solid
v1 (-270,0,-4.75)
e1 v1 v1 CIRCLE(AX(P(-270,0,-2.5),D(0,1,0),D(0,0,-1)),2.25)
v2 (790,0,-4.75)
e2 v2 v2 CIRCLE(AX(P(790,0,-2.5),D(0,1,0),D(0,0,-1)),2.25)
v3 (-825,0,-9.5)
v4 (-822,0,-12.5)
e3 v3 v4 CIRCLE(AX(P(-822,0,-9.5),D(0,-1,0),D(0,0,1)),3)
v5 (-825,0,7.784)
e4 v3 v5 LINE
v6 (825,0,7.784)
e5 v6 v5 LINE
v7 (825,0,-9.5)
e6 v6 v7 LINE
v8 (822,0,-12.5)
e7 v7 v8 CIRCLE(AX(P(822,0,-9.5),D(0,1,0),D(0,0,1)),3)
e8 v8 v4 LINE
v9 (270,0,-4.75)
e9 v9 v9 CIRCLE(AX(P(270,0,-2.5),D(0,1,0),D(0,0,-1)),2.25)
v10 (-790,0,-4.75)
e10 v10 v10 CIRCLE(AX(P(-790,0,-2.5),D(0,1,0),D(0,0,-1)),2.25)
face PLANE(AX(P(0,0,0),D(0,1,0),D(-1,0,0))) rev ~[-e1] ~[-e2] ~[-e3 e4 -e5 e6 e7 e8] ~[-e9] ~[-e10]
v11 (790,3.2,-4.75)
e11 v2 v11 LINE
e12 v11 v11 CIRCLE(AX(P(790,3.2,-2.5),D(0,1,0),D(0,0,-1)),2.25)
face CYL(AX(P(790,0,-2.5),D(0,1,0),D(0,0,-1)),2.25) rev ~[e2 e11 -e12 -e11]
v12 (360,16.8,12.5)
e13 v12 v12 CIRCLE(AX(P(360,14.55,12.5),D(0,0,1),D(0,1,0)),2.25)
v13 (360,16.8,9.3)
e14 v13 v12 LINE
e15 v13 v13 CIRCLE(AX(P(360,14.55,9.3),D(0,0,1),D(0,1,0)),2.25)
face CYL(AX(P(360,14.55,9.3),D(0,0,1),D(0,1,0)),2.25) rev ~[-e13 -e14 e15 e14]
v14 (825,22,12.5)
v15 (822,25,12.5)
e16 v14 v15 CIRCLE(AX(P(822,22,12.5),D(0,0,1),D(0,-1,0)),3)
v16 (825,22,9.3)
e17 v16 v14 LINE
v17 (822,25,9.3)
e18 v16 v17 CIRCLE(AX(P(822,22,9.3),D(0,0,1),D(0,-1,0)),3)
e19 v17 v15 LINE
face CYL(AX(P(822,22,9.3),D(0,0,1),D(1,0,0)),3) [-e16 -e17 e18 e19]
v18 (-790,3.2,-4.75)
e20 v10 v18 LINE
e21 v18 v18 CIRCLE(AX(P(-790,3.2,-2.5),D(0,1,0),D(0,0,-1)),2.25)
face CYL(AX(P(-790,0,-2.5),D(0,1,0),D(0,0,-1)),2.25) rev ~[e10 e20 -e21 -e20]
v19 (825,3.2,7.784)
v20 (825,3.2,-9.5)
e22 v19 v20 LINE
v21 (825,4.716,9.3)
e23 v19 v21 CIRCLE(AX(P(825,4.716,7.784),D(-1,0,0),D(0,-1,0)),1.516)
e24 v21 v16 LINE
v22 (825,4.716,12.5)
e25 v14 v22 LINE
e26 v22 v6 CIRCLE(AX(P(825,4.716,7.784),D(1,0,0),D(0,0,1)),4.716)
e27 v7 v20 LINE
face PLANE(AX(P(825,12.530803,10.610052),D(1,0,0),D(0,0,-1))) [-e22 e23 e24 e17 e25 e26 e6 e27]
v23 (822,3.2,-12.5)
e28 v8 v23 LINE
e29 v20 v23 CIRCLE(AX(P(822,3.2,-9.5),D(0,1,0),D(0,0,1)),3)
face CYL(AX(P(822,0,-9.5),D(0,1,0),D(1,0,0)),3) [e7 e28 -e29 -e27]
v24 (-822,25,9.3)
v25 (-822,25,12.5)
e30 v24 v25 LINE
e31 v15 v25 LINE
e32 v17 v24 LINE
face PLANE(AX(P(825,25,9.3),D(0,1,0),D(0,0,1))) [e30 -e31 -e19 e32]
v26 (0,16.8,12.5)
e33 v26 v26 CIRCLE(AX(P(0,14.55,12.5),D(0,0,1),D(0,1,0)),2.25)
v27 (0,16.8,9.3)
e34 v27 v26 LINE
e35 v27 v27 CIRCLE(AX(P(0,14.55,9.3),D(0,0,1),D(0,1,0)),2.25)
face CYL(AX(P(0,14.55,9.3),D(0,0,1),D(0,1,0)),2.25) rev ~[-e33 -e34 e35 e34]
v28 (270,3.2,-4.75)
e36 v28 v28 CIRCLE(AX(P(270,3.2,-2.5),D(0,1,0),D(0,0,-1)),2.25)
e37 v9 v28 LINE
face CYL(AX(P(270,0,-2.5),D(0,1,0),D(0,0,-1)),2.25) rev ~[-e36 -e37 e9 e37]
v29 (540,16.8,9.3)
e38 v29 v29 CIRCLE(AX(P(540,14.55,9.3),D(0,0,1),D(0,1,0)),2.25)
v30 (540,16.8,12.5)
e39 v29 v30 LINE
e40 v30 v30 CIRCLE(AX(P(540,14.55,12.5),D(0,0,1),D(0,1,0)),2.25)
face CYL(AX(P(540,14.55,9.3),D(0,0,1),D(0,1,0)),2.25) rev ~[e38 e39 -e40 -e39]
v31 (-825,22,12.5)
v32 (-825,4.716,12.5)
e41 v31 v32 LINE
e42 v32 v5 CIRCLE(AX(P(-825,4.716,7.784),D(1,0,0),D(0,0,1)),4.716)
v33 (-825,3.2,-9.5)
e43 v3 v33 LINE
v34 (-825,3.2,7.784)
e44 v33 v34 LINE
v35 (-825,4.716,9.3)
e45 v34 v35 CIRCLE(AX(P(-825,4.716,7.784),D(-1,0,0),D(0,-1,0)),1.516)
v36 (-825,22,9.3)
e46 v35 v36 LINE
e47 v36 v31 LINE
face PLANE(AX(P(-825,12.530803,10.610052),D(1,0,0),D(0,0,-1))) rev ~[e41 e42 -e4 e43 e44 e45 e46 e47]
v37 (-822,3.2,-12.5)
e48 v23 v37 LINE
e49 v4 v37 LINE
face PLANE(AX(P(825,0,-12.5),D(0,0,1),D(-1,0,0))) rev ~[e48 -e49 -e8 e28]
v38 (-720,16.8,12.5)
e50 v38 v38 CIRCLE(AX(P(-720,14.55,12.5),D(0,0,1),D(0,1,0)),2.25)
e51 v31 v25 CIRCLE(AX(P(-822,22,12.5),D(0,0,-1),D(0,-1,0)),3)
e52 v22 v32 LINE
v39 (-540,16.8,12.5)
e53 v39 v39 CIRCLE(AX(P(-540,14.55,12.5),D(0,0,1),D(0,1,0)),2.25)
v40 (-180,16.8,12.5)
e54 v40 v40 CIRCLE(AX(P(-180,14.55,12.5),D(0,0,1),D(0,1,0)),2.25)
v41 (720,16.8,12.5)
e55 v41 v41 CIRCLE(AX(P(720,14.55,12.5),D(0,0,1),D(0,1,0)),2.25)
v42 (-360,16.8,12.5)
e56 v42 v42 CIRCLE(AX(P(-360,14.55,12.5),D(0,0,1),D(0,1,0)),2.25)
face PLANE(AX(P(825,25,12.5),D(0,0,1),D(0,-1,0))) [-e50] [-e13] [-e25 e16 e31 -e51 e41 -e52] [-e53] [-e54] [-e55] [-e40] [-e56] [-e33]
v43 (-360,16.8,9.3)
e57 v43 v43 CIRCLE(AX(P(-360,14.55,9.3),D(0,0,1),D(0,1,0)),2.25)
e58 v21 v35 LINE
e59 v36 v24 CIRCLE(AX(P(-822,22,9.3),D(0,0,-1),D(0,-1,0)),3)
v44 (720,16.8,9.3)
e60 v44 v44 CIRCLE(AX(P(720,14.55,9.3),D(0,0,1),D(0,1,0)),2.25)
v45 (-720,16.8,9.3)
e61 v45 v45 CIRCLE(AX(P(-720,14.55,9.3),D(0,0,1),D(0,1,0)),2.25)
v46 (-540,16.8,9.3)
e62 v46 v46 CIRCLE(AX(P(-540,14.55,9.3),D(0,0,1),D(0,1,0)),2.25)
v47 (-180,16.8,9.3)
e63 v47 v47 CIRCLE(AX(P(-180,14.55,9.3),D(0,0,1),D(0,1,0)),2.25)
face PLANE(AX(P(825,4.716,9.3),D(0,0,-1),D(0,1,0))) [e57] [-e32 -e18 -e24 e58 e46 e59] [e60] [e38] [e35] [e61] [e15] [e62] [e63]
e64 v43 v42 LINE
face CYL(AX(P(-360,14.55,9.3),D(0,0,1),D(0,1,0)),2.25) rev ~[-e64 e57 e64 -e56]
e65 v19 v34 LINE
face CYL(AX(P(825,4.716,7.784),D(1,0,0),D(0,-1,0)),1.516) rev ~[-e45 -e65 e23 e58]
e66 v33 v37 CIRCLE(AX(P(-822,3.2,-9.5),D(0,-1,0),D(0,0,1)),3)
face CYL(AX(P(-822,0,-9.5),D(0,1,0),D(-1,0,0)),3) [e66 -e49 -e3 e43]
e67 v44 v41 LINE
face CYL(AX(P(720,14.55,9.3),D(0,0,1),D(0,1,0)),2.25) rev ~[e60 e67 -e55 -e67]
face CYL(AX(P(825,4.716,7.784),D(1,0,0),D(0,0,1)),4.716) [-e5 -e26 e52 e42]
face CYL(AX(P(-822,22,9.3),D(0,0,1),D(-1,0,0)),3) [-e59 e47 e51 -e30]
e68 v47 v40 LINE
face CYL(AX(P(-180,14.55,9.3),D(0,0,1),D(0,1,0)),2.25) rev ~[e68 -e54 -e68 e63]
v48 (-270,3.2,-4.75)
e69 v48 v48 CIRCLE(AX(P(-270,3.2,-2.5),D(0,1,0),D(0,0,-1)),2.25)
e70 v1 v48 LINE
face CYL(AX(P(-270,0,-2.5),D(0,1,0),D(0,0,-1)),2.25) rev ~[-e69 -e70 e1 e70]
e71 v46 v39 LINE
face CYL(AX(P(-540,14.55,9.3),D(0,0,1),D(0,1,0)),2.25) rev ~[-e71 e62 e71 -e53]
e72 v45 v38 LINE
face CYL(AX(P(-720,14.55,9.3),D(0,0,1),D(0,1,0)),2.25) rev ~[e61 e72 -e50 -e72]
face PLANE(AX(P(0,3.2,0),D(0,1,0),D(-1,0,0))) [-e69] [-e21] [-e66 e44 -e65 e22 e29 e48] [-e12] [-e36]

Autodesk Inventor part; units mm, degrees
ref_plane "YZ Plane" through (0, 0, 0) normal (1, 0, 0) x (0, 1, 0)
ref_plane "XZ Plane" through (0, 0, 0) normal (0, 1, 0) x (-1, 0, 0)
ref_plane "XY Plane" through (0, 0, 0) normal (0, 0, 1) x (1, 0, 0)
sketch "Sketch1" plane through (0, 0, 0) normal (0, 1, 0) x (-1, 0, 0)
  line L0 (825, 12.5) -> (-825, 12.5)
  line L1 (-825, 12.5) -> (-825, -12.5)
  line L2 (-825, -12.5) -> (825, -12.5)
  line L3 (825, -12.5) -> (825, 12.5)
  line L4 (825, 12.5) -> (-825, -12.5) construction
  line L5 (-825, 12.5) -> (825, -12.5) construction
  point P0 (0, 0)
  dimension "d0" = 1650
  dimension "d1" = 25
extrude "Plate1" add sketch "Sketch1" along normal blind 3.2
sketch "Sketch2" plane through (825, 0, 9.3) normal (0, 0, 1) x (1, 0, 0)
  line L0 (-1650, 0) -> (0, 0)
  line L1 (0, 0) -> (0, 25)
  line L2 (0, 25) -> (-1650, 25)
  line L3 (-1650, 25) -> (-1650, 0)
edge flange "Flange1" height 25 angle 90 thickness 3.2 bend radius 1.516 thickness toward (0, 0, 1) relief tear relief width 3.2 relief depth 1.6 edges at (0, 3.2, 12.5) wall of the first edge with corners at (-825, 0, 9.3) (825, 0, 9.3) (825, 25, 9.3) (-825, 25, 9.3)
bend "Bend1"
corner "Corner1"
sketch "Sketch3" plane through (825, 25, 9.3) normal (0, 0, -1) x (-1, 0, 0)
  circle A0 centre (105, -10.45) radius 1.5706 projected
  circle A1 centre (285, -10.45) radius 1.5706 projected
  circle A2 centre (465, -10.45) radius 1.5706 projected
  circle A3 centre (825, -10.45) radius 1.5706 projected
  circle A4 centre (1005, -10.45) radius 1.5706 projected
  circle A5 centre (1185, -10.45) radius 1.5706 projected
  circle A6 centre (1365, -10.45) radius 1.5706 projected
  circle A7 centre (1545, -10.45) radius 1.5706 projected
  point P0 (825, -25)
hole "Hole1" at (540, 14.55, 9.3) at (720, 14.55, 9.3) at (360, 14.55, 9.3) at (0, 14.55, 9.3) at (-180, 14.55, 9.3) at (-360, 14.55, 9.3) at (-540, 14.55, 9.3) at (-720, 14.55, 9.3) direction (0, 0, 1) diameter 4.5 depth 3.2 tip angle 118 clearance for "Countersunk Flat Head Screw ISO 2009/7046" size "M4" standard "ISO"
sketch "Sketch8" plane through (0, 0, 0) normal (0, -1, 0) x (1, 0, 0)
  line L0 (-825, -12.5) -> (825, -12.5) projected
  line L1 (0, -12.5) -> (0, -2.5)
  line L2 (0, -2.5) -> (-270, -2.5)
  line L3 (-270, -2.5) -> (-790, -2.5)
  line L4 (0, -2.5) -> (270, -2.5)
  line L5 (270, -2.5) -> (790, -2.5)
  point P0 (0, 0)
  dimension "d40" = 10
  dimension "d41" = 270
  dimension "d42" = 520
  dimension "d43" = 180
hole "Hole2" at (-790, 0, -2.5) at (-270, 0, -2.5) at (270, 0, -2.5) at (790, 0, -2.5) direction (0, 1, 0) diameter 4.5 depth 3.2 tip angle 118 clearance for "Countersunk Flat Head Screw ISO 2009/7046" size "M4" standard "ISO"
fillet "Corner Round1" radius 3 4 edges at (825, 1.6, -12.5) (-825, 25, 10.9) (825, 25, 10.9) (-825, 1.6, -12.5)
equation "\"d18\" = Thickness"
equation "\"d37\" = Thickness"
equation "\"d2\" = Thickness"
equation "\"d3\" = BendReliefWidth"
equation "\"d4\" = BendReliefDepth"
equation "\"d5\" = MinimumRemnant"
equation "\"d6\" = TransitionRadius"
equation "\"d9\" = BendRadius"
equation "\"d10\" = CornerReliefSize"
equation "\"d11\" = GapSize"
equation "\"d12\" = JacobiRadiusSize"
equation "\"BendReliefWidth\" = Thickness"
equation "\"BendReliefDepth\" = 0.5 * Thickness"
equation "\"CornerReliefSize\" = 4 * Thickness"
equation "\"MinimumRemnant\" = 2 * Thickness"
equation "\"TransitionRadius\" = BendRadius"
equation "\"JacobiRadiusSize\" = BendRadius"
equation "\"GapSize\" = Thickness"
equation "\"Thickness\" = 3.2"
equation "\"BendRadius\" = 1.516"
properties part number "SP39V1 Chapa Acrilico" material "Steel, Carbon"
